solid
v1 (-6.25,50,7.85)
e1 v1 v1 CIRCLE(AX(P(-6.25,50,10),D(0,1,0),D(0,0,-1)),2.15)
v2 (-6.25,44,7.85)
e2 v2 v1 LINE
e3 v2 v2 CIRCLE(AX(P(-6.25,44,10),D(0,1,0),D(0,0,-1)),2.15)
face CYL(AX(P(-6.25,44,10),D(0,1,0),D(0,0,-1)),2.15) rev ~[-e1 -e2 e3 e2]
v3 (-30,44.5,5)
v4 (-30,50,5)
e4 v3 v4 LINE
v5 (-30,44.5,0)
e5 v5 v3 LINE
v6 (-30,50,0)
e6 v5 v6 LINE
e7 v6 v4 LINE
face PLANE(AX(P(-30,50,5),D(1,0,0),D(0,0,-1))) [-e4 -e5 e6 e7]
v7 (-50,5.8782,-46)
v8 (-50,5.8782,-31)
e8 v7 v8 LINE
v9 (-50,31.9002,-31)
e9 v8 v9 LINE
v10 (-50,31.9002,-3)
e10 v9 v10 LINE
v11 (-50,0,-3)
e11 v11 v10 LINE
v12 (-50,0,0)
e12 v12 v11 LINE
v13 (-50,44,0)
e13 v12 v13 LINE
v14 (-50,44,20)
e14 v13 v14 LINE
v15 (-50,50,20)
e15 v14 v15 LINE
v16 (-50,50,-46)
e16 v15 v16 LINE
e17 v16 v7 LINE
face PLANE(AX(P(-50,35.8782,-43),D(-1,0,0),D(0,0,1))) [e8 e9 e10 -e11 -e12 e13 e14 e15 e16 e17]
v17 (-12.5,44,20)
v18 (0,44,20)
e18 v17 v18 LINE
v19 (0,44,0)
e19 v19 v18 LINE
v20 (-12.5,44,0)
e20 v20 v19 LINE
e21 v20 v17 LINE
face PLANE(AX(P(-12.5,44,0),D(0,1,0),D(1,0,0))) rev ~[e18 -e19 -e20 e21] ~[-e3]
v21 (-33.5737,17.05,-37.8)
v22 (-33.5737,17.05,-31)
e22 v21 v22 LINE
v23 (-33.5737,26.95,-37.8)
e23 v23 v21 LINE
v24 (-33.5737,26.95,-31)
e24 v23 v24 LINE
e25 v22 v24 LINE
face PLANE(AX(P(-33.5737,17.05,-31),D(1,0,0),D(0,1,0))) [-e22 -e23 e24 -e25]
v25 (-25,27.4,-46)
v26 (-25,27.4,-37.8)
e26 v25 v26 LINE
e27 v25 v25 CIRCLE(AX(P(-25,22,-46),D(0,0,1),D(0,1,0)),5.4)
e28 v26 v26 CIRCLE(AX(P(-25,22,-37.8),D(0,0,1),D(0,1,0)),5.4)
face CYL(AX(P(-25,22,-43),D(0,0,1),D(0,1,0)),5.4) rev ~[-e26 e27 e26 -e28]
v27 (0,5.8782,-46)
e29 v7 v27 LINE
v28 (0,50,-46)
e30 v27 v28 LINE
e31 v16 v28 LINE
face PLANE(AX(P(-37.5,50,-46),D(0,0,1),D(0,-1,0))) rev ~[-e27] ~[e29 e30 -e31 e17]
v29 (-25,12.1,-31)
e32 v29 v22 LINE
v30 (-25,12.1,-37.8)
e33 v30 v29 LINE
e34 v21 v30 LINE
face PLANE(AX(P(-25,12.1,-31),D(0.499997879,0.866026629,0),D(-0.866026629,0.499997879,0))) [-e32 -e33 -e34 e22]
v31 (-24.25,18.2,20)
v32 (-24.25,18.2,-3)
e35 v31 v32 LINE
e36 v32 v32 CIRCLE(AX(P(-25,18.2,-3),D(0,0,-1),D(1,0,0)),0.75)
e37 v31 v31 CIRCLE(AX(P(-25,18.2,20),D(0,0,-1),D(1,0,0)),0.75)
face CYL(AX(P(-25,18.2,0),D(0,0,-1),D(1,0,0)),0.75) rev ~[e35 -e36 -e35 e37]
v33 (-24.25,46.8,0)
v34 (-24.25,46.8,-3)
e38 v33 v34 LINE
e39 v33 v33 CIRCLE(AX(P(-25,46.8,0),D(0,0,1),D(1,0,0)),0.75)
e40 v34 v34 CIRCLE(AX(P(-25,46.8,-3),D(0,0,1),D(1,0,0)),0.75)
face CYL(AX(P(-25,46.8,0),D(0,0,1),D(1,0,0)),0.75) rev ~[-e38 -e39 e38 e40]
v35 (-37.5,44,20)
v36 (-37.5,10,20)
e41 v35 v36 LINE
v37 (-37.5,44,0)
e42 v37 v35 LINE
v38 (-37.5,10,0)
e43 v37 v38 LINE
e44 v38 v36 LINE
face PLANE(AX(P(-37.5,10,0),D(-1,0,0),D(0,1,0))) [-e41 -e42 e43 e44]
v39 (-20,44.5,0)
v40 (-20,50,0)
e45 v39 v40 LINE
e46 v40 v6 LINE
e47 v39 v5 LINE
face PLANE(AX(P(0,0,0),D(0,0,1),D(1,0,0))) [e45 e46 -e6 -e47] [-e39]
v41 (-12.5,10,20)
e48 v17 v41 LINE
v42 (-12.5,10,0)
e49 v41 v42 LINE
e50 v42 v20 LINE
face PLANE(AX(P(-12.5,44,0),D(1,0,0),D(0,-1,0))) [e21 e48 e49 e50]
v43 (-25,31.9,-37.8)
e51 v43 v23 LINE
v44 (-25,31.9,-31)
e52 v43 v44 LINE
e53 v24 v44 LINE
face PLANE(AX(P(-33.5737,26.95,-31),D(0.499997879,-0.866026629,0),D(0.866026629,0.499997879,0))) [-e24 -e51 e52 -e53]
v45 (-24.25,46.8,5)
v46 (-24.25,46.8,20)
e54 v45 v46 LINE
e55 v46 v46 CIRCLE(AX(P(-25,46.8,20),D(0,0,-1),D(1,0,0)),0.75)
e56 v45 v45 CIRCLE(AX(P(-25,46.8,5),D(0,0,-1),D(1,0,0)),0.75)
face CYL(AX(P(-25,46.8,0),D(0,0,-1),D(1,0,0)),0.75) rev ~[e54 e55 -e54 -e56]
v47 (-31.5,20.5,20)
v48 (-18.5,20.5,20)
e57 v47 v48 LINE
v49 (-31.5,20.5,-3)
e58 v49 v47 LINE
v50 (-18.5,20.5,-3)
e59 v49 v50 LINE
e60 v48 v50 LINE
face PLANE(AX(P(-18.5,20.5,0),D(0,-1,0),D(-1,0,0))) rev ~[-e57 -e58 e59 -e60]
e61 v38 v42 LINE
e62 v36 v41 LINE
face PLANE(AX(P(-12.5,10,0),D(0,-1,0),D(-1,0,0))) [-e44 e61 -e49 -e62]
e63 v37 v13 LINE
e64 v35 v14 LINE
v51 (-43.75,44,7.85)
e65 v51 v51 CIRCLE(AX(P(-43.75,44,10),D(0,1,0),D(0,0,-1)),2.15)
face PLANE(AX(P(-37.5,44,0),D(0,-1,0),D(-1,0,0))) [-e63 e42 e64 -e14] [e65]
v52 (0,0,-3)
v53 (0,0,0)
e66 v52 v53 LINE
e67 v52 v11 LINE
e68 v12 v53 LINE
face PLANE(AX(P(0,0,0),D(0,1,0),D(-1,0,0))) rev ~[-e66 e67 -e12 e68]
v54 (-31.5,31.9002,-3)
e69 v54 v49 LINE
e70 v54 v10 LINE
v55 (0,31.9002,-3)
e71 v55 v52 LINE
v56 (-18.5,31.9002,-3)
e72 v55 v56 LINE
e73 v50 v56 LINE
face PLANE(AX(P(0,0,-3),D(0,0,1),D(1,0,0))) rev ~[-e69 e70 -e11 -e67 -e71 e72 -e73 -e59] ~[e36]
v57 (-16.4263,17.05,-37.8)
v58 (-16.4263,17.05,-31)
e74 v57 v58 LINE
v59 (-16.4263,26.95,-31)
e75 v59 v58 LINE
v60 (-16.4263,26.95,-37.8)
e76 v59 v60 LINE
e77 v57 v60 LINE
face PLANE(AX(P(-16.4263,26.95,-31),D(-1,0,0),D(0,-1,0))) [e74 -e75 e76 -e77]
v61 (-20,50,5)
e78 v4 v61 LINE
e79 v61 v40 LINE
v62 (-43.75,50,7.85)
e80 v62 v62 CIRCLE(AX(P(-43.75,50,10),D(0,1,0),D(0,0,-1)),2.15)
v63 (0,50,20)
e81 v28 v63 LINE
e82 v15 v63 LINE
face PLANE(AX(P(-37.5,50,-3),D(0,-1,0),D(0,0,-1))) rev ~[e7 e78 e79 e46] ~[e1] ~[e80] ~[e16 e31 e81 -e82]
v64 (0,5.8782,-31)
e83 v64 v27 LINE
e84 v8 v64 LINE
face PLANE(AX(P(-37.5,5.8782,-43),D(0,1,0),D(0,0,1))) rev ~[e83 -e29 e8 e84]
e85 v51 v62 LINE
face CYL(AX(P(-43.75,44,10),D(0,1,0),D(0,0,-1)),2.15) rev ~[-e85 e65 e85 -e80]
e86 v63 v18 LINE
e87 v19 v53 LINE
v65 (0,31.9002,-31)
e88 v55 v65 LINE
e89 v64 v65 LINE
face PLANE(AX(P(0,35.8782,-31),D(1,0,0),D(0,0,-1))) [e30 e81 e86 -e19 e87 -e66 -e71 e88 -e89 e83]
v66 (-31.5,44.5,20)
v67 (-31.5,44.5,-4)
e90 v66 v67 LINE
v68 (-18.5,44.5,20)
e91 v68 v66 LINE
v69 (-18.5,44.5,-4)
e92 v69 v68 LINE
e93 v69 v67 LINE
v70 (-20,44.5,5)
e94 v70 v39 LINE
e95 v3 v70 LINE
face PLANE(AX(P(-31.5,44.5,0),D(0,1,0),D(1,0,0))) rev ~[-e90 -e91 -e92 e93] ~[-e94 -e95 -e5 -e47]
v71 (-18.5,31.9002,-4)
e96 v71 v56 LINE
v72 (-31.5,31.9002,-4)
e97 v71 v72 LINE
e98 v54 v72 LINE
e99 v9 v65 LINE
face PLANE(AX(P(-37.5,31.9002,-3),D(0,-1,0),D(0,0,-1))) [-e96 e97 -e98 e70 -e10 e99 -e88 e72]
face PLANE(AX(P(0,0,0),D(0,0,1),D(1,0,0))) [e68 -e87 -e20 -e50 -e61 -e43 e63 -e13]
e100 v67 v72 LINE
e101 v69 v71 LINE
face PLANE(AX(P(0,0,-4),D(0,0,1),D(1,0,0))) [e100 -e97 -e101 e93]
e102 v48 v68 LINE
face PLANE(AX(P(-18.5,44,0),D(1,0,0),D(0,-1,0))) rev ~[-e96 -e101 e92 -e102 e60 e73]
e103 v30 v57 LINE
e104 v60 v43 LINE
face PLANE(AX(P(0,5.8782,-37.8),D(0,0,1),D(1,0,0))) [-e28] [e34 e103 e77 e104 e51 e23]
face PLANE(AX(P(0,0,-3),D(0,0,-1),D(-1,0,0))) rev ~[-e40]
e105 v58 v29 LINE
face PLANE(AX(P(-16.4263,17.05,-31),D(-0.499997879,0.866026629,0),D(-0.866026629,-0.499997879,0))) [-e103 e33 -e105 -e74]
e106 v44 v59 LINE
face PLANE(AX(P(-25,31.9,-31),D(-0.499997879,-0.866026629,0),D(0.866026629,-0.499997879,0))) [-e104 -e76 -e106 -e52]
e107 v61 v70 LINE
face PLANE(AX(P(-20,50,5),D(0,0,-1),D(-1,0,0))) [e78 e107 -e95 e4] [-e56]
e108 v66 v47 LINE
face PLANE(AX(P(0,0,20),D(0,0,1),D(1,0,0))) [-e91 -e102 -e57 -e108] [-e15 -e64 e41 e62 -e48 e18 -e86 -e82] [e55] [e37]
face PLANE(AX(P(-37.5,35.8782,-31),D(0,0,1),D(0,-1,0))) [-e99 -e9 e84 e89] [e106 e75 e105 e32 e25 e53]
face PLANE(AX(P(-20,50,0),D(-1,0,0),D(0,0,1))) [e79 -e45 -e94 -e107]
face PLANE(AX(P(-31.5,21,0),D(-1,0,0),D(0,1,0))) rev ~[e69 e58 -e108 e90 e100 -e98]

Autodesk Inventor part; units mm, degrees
ref_plane "YZ Plane" through (0, 0, 0) normal (1, 0, 0) x (0, 1, 0)
ref_plane "XZ Plane" through (0, 0, 0) normal (0, 1, 0) x (-1, 0, 0)
ref_plane "XY Plane" through (0, 0, 0) normal (0, 0, 1) x (1, 0, 0)
sketch "Sketch1" plane through (0, 0, 0) normal (0, 0, 1) x (1, 0, 0)
  point P0 (0, 0)
sketch "Sketch2" plane through (0, 0, 0) normal (0, 0, 1) x (1, 0, 0)
  line L0 (0, 0) -> (-50, 0)
  line L1 (0, 0) -> (-50, 0)
  line L2 (0, 0) -> (-50, 0)
  line L3 (-50, 0) -> (-50, 50)
  line L4 (-50, 50) -> (0, 50)
  line L5 (0, 50) -> (0, 0)
  line L6 (-31.5, 44) -> (-18.5, 44)
  line L7 (-18.5, 44) -> (-18.5, 21)
  line L8 (-18.5, 21) -> (-31.5, 21)
  line L9 (-31.5, 21) -> (-31.5, 44)
  circle A0 centre (-25, 46.8) radius 0.75
  circle A1 centre (-25, 18.2) radius 0.75
  line L10 (-37.5, 50) -> (-12.5, 50)
  line L11 (-12.5, 50) -> (-12.5, 10)
  line L12 (-12.5, 10) -> (-37.5, 10)
  line L13 (-37.5, 10) -> (-37.5, 50)
  line L14 (-37.5, 44) -> (-50, 44)
  line L15 (-12.5, 44) -> (0, 44)
  dimension "d4" = 50
  dimension "d5" = 50
  dimension "d6" = 13
  dimension "d7" = 23
  dimension "d8" = 18.5
  dimension "d9" = 6
  dimension "d10" = 1.5
  dimension "d11" = 6.5
  dimension "d12" = 2.8
  dimension "d13" = 1.5
  dimension "d14" = 6.5
  dimension "d15" = 2.8
  dimension "d16" = 25
  dimension "d17" = 40
  dimension "d18" = 12.5
extrude "Extrusion1" add sketch "Sketch2" along normal blind 20 contours L11 L12 L13 L4
extrude "Extrusion2" add sketch "Sketch2" along normal blind 3 contours L6 L7 L8 L9
extrude "Extrusion3" add sketch "Sketch2" against normal blind 3 contours L0 L3 L14 L13 L12 L11 L15 L5 | L15 L11 L4 L5 | L3 L4 L13 L14
extrude "Extrusion4" add sketch "Sketch2" against normal blind 3 contours L11 L12 L13 L4
extrude "Extrusion5" add sketch "Sketch2" against normal blind 3 contours L6 L7 L8 L9
sketch "Sketch3" plane through (-18.5, 21, 20) normal (-1, 0, 0) x (0, 0, 1)
  point P0 (-20, -21)
sketch "Sketch4" plane through (0, 0, -3) normal (0, 0, -1) x (-1, 0, 0)
  line L0 (12.5, 50) -> (37.5, 50) projected
  line L1 (37.5, 50) -> (37.5, 10) projected
  line L2 (12.5, 50) -> (37.5, 50)
  line L3 (37.5, 50) -> (37.5, 35.8782)
  line L4 (37.5, 35.8782) -> (12.5, 35.8782)
  line L5 (12.5, 35.8782) -> (12.5, 50)
  point P0 (0, 0)
extrude "Extrusion6" add sketch "Sketch4" along normal blind 40
sketch "Sketch5" plane through (-37.5, 35.8782, -3) normal (0, -1, 0) x (1, 0, 0)
  line L0 (0, -40) -> (25, -40) projected
  line L1 (25, -40) -> (0, -40)
  line L2 (0, -40) -> (0, -28)
  line L3 (0, -28) -> (25, -28)
  line L4 (25, -28) -> (25, -40)
  point P0 (37.5, 3)
  dimension "d31" = 25
  dimension "d32" = 12
extrude "Extrusion7" add sketch "Sketch5" along normal blind 30
sketch "Sketch6" plane through (0, 0, -43) normal (0, 0, -1) x (-1, 0, 0)
  circle A0 centre (25, 22) radius 5.4
  line L0 (37.5, 50) -> (12.5, 50) projected
  line L1 (37.5, 50) -> (37.5, 5.8782) projected
  point P0 (0, 0)
  dimension "d35" = 10.8
  dimension "d36" = 28
  dimension "d37" = 12.5
hole "Hole1" at (-25, 22, -43) direction (0, 0, 1) diameter 10.8 depth 12
sketch "Sketch7" plane through (-37.5, 50, 20) normal (0, 1, 0) x (1, 0, 0)
  line L0 (0, 20) -> (25, 20) projected
  line L1 (7.5, 20) -> (17.5, 20)
  line L2 (17.5, 20) -> (17.5, 15)
  line L3 (17.5, 15) -> (7.5, 15)
  line L4 (7.5, 15) -> (7.5, 20)
  line L5 (0, 20) -> (0, 0) projected
  point P0 (37.5, 20)
  dimension "d47" = 10
  dimension "d48" = 5
  dimension "d49" = 7.5
extrude "Extrusion8" cut sketch "Sketch7" against normal blind 10
extrude "Extrusion9" cut sketch "Sketch2" against normal blind 2 contours L6 L7 L8 L9
extrude "Extrusion10" cut sketch "Sketch2" along normal blind 3 contours L6 L7 L8 L9
extrude "Extrusion11" add sketch "Sketch2" against normal blind 3 contours L6 L7 L8 L9
extrude "Extrusion12" cut sketch "Sketch2" against normal blind 4 contours L6 L7 L8 L9
thicken "Thicken1" operation add thickness 12.5 both sides no extend neighbours yes toward (1, 0, 0) faces at (-12.5, 45.2927, -25.6667)
thicken "Thicken2" operation add thickness 12.5 both sides no extend neighbours yes toward (-1, 0, 0) faces at (-37.5, 45.2927, -25.6667)
thicken "Thicken3" operation add thickness 0.5 both sides no extend neighbours yes toward (0, -1, 0) faces at (-27.1667, 21, 12.3333)
thicken "Thicken4" operation add thickness 0.5 both sides no extend neighbours yes toward (0, 1, 0) faces at (-26.6667, 44, 15)
sketch "Sketch8" plane through (0, 5.8782, -31) normal (0, 0, 1) x (1, 0, 0)
  point P0 (0, -5.8782)
sketch "Sketch9" plane through (0, 5.8782, -31) normal (0, 0, 1) x (1, 0, 0)
  circle A0 centre (-25, 16.1218) radius 5.4 projected
  circle A1 centre (-25, 16.1218) radius 9.9
  line L0 (-25, 6.2218) -> (-33.5737, 11.1718)
  line L1 (-33.5737, 11.1718) -> (-33.5737, 21.0718)
  line L2 (-33.5737, 21.0718) -> (-25, 26.0218)
  line L3 (-25, 26.0218) -> (-16.4263, 21.0718)
  line L4 (-16.4263, 21.0718) -> (-16.4263, 11.1718)
  line L5 (-16.4263, 11.1718) -> (-25, 6.2218)
  point P0 (0, -5.8782)
  dimension "d68" = 19.8
extrude "Extrusion13" cut sketch "Sketch9" against normal blind 6.8 contours A0 | L4 L5 L0 L1 L2 L3
thicken "Thicken5" operation add thickness 3.978 both sides no extend neighbours yes toward (0, -1, 0) faces at (-22.8333, 35.8782, -22)
thicken "Thicken6" operation add thickness 3 both sides no extend neighbours yes toward (0, 0, -1) faces at (-25, 42.4667, -43)
extrude "Extrusion14" add sketch "Sketch2" along normal up to surface (20 mm away) contours L15 L11 L4 L5 | L3 L4 L13 L14
sketch "Sketch10" plane through (-50, 44, 20) normal (0, -1, 0) x (1, 0, 0)
  point P0 (50, -20)
sketch "Sketch11" plane through (-50, 44, 20) normal (0, -1, 0) x (1, 0, 0)
  line L0 (12.5, -20) -> (0, 0)
  line L1 (12.5, 0) -> (12.5, -20) projected
  line L2 (12.5, 0) -> (0, -20)
  point P0 (50, -20)
  point P1 (6.25, -10)
hole "Hole2" at (-43.75, 44, 10) direction (0, 1, 0) diameter 4.3 end through all
sketch "Sketch12" plane through (-12.5, 44, 20) normal (0, -1, 0) x (1, 0, 0)
  line L0 (0, -20) -> (0, 0) projected
  line L1 (12.5, -20) -> (0, 0)
  line L2 (12.5, 0) -> (0, -20)
  point P0 (6.25, -10)
hole "Hole3" at (-6.25, 44, 10) direction (0, 1, 0) diameter 4.3 end through all
sketch "Sketch13" plane through (-50, 50, 20) normal (0, 1, 0) x (1, 0, 0)
  circle A0 centre (6.25, 10) radius 2.15 projected
  circle A1 centre (6.25, 10) radius 2.15
  circle A2 centre (43.75, 10) radius 2.15 projected
  circle A3 centre (43.75, 10) radius 2.15
  line L0 (-0.0918, 20) -> (50, 20)
  line L1 (50, 20) -> (50, 0)
  line L2 (50, 0) -> (-0.0918, 0)
  line L3 (-0.0918, 0) -> (-0.0918, 20)
properties part number "servo_holder"
